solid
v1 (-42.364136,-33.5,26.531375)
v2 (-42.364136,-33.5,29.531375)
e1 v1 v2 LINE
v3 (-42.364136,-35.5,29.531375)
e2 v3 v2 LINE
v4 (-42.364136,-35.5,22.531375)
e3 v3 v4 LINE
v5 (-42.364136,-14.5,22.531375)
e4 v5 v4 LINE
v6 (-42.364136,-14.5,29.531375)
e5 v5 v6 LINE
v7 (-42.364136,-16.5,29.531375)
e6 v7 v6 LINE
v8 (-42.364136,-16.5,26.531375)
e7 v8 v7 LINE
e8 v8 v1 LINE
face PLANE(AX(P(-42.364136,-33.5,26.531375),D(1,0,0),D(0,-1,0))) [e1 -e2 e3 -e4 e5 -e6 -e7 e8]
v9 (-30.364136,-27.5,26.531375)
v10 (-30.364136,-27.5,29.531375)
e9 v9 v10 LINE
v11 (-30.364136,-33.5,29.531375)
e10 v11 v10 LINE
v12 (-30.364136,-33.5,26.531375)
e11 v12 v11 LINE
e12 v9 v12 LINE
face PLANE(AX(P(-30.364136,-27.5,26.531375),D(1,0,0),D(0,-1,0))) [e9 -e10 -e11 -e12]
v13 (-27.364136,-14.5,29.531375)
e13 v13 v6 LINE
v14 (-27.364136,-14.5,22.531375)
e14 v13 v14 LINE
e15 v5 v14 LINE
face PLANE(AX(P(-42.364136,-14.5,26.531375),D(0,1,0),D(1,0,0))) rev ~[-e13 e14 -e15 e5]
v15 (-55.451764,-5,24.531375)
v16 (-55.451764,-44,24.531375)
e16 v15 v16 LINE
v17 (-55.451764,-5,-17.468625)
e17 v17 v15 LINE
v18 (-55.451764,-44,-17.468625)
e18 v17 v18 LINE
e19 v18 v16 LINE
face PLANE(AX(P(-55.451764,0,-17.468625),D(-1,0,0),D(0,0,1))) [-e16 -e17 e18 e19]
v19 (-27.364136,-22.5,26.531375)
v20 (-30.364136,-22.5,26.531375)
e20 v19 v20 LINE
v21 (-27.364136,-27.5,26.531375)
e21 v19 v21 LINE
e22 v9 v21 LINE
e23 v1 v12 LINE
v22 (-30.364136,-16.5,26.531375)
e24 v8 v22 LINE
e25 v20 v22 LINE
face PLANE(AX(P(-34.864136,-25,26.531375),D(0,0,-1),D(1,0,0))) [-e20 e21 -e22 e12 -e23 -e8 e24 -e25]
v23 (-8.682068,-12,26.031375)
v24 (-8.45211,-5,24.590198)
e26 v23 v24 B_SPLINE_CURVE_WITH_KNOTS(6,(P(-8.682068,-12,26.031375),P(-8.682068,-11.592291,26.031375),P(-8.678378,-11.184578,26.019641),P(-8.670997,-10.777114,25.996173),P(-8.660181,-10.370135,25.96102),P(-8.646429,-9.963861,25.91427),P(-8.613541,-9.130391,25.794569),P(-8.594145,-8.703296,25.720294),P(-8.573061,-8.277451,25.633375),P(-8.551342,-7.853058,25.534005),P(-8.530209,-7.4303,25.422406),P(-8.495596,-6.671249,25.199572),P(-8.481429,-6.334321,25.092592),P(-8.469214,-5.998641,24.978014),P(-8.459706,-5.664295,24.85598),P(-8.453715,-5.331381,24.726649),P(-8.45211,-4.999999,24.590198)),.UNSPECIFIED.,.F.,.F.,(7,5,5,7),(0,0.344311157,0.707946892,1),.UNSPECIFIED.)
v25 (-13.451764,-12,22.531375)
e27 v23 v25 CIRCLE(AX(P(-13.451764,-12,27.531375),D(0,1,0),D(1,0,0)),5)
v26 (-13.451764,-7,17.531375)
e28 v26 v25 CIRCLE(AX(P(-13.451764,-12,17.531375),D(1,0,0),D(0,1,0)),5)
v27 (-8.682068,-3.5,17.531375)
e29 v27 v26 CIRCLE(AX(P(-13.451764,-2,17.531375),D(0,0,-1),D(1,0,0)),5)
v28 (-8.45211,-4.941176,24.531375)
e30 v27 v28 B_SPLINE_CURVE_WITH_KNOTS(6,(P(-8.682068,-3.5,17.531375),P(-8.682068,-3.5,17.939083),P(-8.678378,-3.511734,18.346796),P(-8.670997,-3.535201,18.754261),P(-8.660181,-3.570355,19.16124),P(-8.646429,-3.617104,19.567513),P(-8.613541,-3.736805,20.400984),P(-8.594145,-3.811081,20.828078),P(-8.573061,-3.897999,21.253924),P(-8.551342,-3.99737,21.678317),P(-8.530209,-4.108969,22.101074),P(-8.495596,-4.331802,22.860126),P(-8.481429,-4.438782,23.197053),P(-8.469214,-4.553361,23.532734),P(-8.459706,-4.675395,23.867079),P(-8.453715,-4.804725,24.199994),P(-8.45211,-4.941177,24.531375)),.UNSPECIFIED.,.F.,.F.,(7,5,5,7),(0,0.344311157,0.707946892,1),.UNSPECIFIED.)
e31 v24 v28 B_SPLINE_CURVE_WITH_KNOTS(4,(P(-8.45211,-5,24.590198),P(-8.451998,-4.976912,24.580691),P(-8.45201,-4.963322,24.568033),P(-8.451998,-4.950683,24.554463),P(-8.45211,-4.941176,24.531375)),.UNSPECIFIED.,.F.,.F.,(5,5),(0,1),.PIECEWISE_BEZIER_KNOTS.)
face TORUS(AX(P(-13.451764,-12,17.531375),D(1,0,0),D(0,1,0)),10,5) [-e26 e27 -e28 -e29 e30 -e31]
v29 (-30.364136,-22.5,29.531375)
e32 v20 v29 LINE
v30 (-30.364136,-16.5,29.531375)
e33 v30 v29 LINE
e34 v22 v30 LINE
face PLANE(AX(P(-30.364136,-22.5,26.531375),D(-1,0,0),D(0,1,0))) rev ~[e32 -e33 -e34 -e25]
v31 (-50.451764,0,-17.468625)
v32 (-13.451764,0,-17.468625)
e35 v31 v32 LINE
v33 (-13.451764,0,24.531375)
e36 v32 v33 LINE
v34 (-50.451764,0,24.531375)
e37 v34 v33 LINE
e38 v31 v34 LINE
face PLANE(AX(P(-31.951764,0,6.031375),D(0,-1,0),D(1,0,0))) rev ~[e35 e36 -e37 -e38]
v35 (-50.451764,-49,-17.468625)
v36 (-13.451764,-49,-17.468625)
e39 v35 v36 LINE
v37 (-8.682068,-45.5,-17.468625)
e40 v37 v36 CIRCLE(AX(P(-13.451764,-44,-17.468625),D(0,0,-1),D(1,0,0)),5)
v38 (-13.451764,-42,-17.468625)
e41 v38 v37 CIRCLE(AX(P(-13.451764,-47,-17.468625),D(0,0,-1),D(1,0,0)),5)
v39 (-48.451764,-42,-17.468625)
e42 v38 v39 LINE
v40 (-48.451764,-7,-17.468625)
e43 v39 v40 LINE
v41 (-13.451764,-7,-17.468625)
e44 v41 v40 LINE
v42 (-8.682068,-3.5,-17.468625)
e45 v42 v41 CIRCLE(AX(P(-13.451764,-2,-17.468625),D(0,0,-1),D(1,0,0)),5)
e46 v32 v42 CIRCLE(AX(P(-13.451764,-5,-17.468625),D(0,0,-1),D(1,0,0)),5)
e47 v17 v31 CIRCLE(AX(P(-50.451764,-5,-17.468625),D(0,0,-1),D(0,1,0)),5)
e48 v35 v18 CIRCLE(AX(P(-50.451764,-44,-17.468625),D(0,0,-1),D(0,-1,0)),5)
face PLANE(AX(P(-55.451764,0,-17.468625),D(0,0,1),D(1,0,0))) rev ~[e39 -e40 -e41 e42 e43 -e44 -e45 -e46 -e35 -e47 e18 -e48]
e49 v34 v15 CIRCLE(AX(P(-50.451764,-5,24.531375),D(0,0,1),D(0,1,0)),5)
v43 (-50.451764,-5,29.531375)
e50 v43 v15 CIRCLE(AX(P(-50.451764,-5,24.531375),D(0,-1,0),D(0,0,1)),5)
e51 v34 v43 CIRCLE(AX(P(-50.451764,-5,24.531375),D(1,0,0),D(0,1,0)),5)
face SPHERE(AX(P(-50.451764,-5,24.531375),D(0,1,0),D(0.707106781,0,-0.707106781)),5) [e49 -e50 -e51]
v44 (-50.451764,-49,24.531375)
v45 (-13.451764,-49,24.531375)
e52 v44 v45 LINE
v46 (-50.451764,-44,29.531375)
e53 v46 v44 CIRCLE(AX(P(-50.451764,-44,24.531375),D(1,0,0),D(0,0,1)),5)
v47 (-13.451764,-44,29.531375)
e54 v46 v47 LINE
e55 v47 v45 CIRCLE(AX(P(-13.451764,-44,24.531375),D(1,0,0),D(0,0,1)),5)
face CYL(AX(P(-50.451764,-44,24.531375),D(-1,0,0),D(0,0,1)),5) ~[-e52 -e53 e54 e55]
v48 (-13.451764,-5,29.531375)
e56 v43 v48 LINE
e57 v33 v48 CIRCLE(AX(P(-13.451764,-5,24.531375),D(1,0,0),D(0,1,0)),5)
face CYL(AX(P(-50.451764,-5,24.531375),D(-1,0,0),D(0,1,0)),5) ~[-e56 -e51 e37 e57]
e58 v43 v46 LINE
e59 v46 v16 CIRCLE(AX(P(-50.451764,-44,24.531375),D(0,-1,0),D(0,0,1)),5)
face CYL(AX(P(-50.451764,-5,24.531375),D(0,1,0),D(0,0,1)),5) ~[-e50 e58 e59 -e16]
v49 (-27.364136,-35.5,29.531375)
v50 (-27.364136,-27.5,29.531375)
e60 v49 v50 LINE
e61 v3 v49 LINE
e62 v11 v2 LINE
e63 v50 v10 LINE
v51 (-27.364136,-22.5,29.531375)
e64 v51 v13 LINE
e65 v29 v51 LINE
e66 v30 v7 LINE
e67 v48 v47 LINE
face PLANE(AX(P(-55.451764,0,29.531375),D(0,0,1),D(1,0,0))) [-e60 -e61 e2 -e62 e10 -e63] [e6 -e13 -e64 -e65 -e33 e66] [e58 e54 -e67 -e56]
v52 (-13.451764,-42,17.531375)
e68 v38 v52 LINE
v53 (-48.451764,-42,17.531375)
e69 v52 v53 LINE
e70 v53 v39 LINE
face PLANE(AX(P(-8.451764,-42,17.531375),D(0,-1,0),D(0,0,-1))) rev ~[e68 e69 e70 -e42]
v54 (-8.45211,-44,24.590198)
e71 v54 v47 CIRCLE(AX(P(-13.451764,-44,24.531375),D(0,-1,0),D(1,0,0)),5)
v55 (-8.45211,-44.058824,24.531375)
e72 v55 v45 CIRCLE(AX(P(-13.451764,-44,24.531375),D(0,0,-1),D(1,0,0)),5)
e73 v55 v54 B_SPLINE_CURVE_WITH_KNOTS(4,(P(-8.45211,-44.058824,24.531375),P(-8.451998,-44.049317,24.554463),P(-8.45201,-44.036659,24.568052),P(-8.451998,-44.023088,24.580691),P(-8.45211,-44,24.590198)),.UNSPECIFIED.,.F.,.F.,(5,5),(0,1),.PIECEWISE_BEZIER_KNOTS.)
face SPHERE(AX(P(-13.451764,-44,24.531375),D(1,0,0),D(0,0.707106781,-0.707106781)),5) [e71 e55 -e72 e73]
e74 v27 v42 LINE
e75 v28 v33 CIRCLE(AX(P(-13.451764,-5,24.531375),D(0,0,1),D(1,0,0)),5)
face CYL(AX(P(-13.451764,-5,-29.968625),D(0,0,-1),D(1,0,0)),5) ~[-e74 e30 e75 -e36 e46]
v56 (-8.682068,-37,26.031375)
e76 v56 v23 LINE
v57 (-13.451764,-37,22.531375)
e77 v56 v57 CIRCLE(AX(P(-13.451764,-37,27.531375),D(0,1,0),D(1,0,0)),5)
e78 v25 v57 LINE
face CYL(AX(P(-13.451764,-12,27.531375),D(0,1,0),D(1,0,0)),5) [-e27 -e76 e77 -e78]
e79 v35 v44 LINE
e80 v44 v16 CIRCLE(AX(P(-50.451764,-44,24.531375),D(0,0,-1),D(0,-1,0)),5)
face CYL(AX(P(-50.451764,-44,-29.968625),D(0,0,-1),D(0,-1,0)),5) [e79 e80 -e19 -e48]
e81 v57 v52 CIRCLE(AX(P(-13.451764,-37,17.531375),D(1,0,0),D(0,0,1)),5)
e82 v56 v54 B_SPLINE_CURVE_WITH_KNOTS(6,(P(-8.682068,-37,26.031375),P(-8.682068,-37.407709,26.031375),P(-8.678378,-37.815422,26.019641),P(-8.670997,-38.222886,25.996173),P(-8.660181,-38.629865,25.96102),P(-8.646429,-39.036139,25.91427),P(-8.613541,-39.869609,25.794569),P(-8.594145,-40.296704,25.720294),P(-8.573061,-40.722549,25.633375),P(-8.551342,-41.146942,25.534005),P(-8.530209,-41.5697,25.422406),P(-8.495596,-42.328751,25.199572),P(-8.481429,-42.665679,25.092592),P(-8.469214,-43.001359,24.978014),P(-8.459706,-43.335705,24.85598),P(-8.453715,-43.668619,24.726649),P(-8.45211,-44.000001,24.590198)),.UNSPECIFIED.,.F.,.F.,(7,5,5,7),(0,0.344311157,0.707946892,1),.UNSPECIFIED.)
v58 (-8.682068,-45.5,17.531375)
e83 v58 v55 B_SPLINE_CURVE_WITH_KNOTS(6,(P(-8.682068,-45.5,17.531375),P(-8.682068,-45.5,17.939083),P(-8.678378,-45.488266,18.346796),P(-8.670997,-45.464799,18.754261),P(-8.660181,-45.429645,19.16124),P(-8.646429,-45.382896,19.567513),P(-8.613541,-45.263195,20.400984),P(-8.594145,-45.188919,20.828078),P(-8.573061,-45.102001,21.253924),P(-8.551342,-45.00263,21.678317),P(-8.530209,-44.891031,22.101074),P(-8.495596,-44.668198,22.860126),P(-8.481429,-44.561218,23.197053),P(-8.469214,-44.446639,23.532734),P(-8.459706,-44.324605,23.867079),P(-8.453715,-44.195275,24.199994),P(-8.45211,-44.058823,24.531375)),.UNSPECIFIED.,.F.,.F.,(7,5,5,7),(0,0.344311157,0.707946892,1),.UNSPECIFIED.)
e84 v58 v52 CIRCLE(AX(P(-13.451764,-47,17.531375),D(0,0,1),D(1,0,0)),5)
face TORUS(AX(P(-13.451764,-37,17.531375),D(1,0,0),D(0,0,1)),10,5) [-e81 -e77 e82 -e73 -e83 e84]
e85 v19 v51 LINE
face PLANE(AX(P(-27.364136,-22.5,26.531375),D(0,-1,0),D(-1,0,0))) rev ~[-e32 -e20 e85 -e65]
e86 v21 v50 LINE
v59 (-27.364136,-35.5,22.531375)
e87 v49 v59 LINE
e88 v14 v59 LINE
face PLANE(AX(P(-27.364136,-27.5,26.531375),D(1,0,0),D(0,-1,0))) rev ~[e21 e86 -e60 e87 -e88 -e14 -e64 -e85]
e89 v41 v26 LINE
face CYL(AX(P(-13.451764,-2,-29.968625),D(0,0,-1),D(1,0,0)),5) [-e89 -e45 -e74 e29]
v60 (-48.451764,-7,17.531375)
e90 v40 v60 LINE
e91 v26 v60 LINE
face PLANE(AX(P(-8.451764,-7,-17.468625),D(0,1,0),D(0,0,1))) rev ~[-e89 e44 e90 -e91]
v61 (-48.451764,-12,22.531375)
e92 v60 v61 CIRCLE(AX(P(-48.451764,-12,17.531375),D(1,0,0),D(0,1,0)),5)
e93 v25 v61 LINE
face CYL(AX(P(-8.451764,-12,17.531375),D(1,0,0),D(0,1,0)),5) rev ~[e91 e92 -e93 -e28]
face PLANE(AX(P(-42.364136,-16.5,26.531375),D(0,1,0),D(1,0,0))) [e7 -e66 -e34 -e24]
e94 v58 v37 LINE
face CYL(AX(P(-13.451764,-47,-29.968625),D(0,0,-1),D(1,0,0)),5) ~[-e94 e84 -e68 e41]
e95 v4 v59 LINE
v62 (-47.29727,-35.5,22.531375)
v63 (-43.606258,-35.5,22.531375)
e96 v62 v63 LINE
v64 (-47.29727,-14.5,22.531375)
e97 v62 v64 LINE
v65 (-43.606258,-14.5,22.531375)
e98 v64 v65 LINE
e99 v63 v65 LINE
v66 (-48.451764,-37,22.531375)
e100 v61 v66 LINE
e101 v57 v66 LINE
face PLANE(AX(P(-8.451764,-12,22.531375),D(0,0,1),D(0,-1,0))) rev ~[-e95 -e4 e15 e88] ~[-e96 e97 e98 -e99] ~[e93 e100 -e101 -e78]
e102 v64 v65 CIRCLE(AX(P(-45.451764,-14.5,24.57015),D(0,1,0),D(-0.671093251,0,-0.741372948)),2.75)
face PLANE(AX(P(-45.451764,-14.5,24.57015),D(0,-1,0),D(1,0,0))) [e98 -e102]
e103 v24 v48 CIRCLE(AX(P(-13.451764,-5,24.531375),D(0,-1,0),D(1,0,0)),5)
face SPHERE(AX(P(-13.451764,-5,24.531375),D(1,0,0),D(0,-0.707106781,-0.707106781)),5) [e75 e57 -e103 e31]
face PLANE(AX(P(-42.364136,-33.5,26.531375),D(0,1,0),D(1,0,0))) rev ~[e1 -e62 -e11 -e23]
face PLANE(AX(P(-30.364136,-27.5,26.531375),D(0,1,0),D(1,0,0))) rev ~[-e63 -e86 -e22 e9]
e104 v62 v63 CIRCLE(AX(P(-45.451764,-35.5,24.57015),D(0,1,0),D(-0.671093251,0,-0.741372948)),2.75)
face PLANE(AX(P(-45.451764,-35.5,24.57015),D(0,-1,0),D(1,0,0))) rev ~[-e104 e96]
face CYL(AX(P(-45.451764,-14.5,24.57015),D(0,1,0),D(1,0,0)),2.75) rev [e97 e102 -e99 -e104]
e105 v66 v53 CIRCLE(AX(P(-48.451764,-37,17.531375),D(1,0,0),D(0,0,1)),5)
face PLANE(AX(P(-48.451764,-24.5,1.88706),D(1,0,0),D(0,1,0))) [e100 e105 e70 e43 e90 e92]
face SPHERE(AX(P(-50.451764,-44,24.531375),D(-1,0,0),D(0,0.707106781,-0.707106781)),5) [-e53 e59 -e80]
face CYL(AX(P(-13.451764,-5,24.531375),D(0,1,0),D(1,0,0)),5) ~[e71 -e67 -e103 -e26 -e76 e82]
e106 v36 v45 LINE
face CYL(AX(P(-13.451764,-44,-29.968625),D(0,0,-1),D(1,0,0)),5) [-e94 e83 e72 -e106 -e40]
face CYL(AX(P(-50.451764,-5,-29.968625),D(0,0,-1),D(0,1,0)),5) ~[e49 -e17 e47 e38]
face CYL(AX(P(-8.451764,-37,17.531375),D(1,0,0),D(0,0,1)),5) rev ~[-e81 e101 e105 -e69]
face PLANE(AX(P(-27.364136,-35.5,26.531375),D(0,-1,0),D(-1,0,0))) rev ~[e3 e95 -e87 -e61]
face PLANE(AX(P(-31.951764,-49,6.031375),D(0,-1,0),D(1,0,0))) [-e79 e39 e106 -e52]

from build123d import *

# Parameters (mm, degrees)
F0_W         = 47
F0_H         = 47
F1_DEPTH     = 49
F3_DEPTH     = 40
F4_T1_DEPTH  = 37
F4_T3_DEPTH  = 54.5
F4_T5_DEPTH  = 39
F4_T7_DEPTH  = 25
F4_T9_DEPTH  = 47.5
F4_S13_W     = 5
F4_S13_H     = 5
F4_T14_DEPTH = 5
F4_S19_W     = 5
F4_S19_H     = 5
F4_T20_DEPTH = 5
F4_S25_W     = 5
F4_S25_H     = 5
F4_T26_DEPTH = 5
F4_S31_W     = 5
F4_S31_H     = 5
F4_T32_DEPTH = 5
F4_T36_ANGLE = 90
F4_T38_ANGLE = 90
F6_R         = 2.75
F7_DEPTH     = 21
F8_W         = 15
F8_H         = 21
F9_DEPTH     = 4
F10_W        = 3
F10_H        = 6
F10_W_2      = 12
F10_H_2      = 2
F11_DEPTH    = 3.0010001


# Not quite as in the source:
# - a fillet or chamfer that OpenCascade refuses, or shapes differently, is made with other operations: its cross-section is extruded or revolved along the edge and cut away or added


with BuildPart() as f1:
    # F0 (on Front) → F1 (new body)
    with BuildSketch(Plane.XZ):
        with Locations((-31.9517639409, 6.0313746929)):
            Rectangle(F0_W, F0_H)
    extrude(amount=F1_DEPTH)

    # F2 (on face) → F3 (cut)
    with BuildSketch(Plane.YZ.offset(-8.4517639409)):
        with BuildLine():
            Line((-12, 22.5313746929), (-37, 22.5313746929))
            ThreePointArc((-37, 22.5313746929), (-40.5355339059, 21.0669085988), (-42, 17.5313746929))
            Line((-42, 17.5313746929), (-42, -17.4686253071))
            Line((-42, -17.4686253071), (-7, -17.4686253071))
            Line((-7, -17.4686253071), (-7, 17.5313746929))
            ThreePointArc((-7, 17.5313746929), (-8.4644660941, 21.0669085988), (-12, 22.5313746929))
        make_face()
    extrude(amount=-F3_DEPTH, mode=Mode.SUBTRACT)

    # F4: fillet of radius 5 on 9 edges, made by hand

    # F4_s2 → F4_t1 (cut)
    with BuildSketch(Plane.YZ.offset(-50.4517639409)):
        with BuildLine():
            ThreePointArc((-44, 29.5313746929), (-47.5355339059, 28.0669085988), (-49, 24.5313746929))
            Line((-49, 24.5313746929), (-49, 29.5313746929))
            Line((-49, 29.5313746929), (-44, 29.5313746929))
        make_face()
        with BuildLine():
            ThreePointArc((0, 24.5313746929), (-1.4644660941, 28.0669085988), (-5, 29.5313746929))
            Line((-5, 29.5313746929), (0, 29.5313746929))
            Line((0, 29.5313746929), (0, 24.5313746929))
        make_face()
    extrude(amount=F4_T1_DEPTH, mode=Mode.SUBTRACT)

    # F4_s4 → F4_t3 (cut)
    with BuildSketch(Plane.XY.offset(-29.9686253071)):
        with BuildLine():
            ThreePointArc((-8.4517639409, -44), (-9.9162300349, -47.5355339059), (-13.4517639409, -49))
            Line((-13.4517639409, -49), (-8.4517639409, -49))
            Line((-8.4517639409, -49), (-8.4517639409, -44))
        make_face()
        with BuildLine():
            ThreePointArc((-8.4517639409, -5), (-9.9162300349, -1.4644660941), (-13.4517639409, 0))
            Line((-13.4517639409, 0), (-8.4517639409, 0))
            Line((-8.4517639409, 0), (-8.4517639409, -5))
        make_face()
        with BuildLine():
            ThreePointArc((-50.4517639409, 0), (-53.9872978468, -1.4644660941), (-55.4517639409, -5))
            Line((-55.4517639409, -5), (-55.4517639409, 0))
            Line((-55.4517639409, 0), (-50.4517639409, 0))
        make_face()
        with BuildLine():
            ThreePointArc((-50.4517639409, -49), (-53.9872978468, -47.5355339059), (-55.4517639409, -44))
            Line((-55.4517639409, -44), (-55.4517639409, -49))
            Line((-55.4517639409, -49), (-50.4517639409, -49))
        make_face()
    extrude(amount=F4_T3_DEPTH, mode=Mode.SUBTRACT)

    # F4_s6 → F4_t5 (cut)
    with BuildSketch(Plane.XZ.offset(5)):
        with BuildLine():
            ThreePointArc((-8.4517639409, 24.5313746929), (-9.9162300349, 28.0669085988), (-13.4517639409, 29.5313746929))
            Line((-13.4517639409, 29.5313746929), (-8.4517639409, 29.5313746929))
            Line((-8.4517639409, 29.5313746929), (-8.4517639409, 24.5313746929))
        make_face()
        with BuildLine():
            ThreePointArc((-50.4517639409, 29.5313746929), (-53.9872978468, 28.0669085988), (-55.4517639409, 24.5313746929))
            Line((-55.4517639409, 24.5313746929), (-55.4517639409, 29.5313746929))
            Line((-55.4517639409, 29.5313746929), (-50.4517639409, 29.5313746929))
        make_face()
    extrude(amount=F4_T5_DEPTH, mode=Mode.SUBTRACT)

    # F4_s8 → F4_t7 (cut)
    with BuildSketch(Plane.XZ.offset(12)):
        with BuildLine():
            ThreePointArc((-8.4517639409, 27.5313746929), (-9.9162300349, 23.995840787), (-13.4517639409, 22.5313746929))
            Line((-13.4517639409, 22.5313746929), (-8.4517639409, 22.5313746929))
            Line((-8.4517639409, 22.5313746929), (-8.4517639409, 27.5313746929))
        make_face()
    extrude(amount=F4_T7_DEPTH, mode=Mode.SUBTRACT)

    # F4_s10 → F4_t9 (cut)
    with BuildSketch(Plane.XY.offset(-29.9686253071)):
        with BuildLine():
            ThreePointArc((-8.4517639409, -47), (-9.9162300349, -43.4644660941), (-13.4517639409, -42))
            Line((-13.4517639409, -42), (-8.4517639409, -42))
            Line((-8.4517639409, -42), (-8.4517639409, -47))
        make_face()
        with BuildLine():
            ThreePointArc((-8.4517639409, -2), (-9.9162300349, -5.5355339059), (-13.4517639409, -7))
            Line((-13.4517639409, -7), (-8.4517639409, -7))
            Line((-8.4517639409, -7), (-8.4517639409, -2))
        make_face()
    extrude(amount=F4_T9_DEPTH, mode=Mode.SUBTRACT)


with BuildPart() as f4_tool12:
    # F4_s13 → F4_t14 (new body)
    with BuildSketch(Plane.YZ.offset(-13.4517639409)):
        with Locations((-46.5, 27.0313746929)):
            Rectangle(F4_S13_W, F4_S13_H)
    extrude(amount=F4_T14_DEPTH)

    # F4_s15 → F4_t16 (revolve, cut)
    with BuildSketch(Plane(origin=(-13.4517639409, -44, 24.5313746929), x_dir=(0, 0.7071067812, -0.7071067812), z_dir=(0, -0.7071067812, -0.7071067812))):
        with BuildLine():
            ThreePointArc((0, -5), (5, 0), (0, 5))
            Line((0, 5), (0, -5))
        make_face()
    revolve(axis=Axis((-13.4517639409, -44, 24.5313746929), (1, 0, 0)), mode=Mode.SUBTRACT)


with BuildPart() as f1_1:
    add(f1.part)

    # F4_t11: cut F4_tool12
    add(f4_tool12.part, mode=Mode.SUBTRACT)


with BuildPart() as f4_tool18:
    # F4_s19 → F4_t20 (new body)
    with BuildSketch(Plane.YZ.offset(-50.4517639409)):
        with Locations((-46.5, 27.0313746929)):
            Rectangle(F4_S19_W, F4_S19_H)
    extrude(amount=-F4_T20_DEPTH)

    # F4_s21 → F4_t22 (revolve, cut)
    with BuildSketch(Plane(origin=(-50.4517639409, -44, 24.5313746929), x_dir=(0, 0.7071067812, -0.7071067812), z_dir=(0, 0.7071067812, 0.7071067812))):
        with BuildLine():
            ThreePointArc((0, -5), (5, 0), (0, 5))
            Line((0, 5), (0, -5))
        make_face()
    revolve(axis=Axis((-50.4517639409, -44, 24.5313746929), (-1, 0, 0)), mode=Mode.SUBTRACT)


with BuildPart() as f1_2:
    add(f1_1.part)

    # F4_t17: cut F4_tool18
    add(f4_tool18.part, mode=Mode.SUBTRACT)


with BuildPart() as f4_tool24:
    # F4_s25 → F4_t26 (new body)
    with BuildSketch(Plane.YZ.offset(-13.4517639409)):
        with Locations((-2.5, 27.0313746929)):
            Rectangle(F4_S25_W, F4_S25_H)
    extrude(amount=F4_T26_DEPTH)

    # F4_s27 → F4_t28 (revolve, cut)
    with BuildSketch(Plane(origin=(-13.4517639409, -5, 24.5313746929), x_dir=(0, -0.7071067812, -0.7071067812), z_dir=(0, -0.7071067812, 0.7071067812))):
        with BuildLine():
            ThreePointArc((0, -5), (5, 0), (0, 5))
            Line((0, 5), (0, -5))
        make_face()
    revolve(axis=Axis((-13.4517639409, -5, 24.5313746929), (1, 0, 0)), mode=Mode.SUBTRACT)


with BuildPart() as f1_3:
    add(f1_2.part)

    # F4_t23: cut F4_tool24
    add(f4_tool24.part, mode=Mode.SUBTRACT)


with BuildPart() as f4_tool30:
    # F4_s31 → F4_t32 (new body)
    with BuildSketch(Plane.XZ.offset(5)):
        with Locations((-52.9517639409, 27.0313746929)):
            Rectangle(F4_S31_W, F4_S31_H)
    extrude(amount=-F4_T32_DEPTH)

    # F4_s33 → F4_t34 (revolve, cut)
    with BuildSketch(Plane(origin=(-50.4517639409, -5, 24.5313746929), x_dir=(0.7071067812, 0, -0.7071067812), z_dir=(0.7071067812, 0, 0.7071067812))):
        with BuildLine():
            ThreePointArc((0, -5), (5, 0), (0, 5))
            Line((0, 5), (0, -5))
        make_face()
    revolve(axis=Axis((-50.4517639409, -5, 24.5313746929), (0, 1, 0)), mode=Mode.SUBTRACT)


with BuildPart() as f1_4:
    add(f1_3.part)

    # F4_t29: cut F4_tool30
    add(f4_tool30.part, mode=Mode.SUBTRACT)

    # F4_s35 → F4_t36 (revolve, cut)
    with BuildSketch(Plane.XY.offset(17.5313746929)):
        with BuildLine():
            ThreePointArc((-8.4517639409, -2), (-9.9162300349, -5.5355339059), (-13.4517639409, -7))
            Line((-13.4517639409, -7), (-8.4517639409, -7))
            Line((-8.4517639409, -7), (-8.4517639409, -2))
        make_face()
    revolve(axis=Axis((-8.4517639409, -12, 17.5313746929), (1, 0, 0)), revolution_arc=F4_T36_ANGLE, mode=Mode.SUBTRACT)

    # F4_s37 → F4_t38 (revolve, cut)
    with BuildSketch(Plane.XZ.offset(37)):
        with BuildLine():
            ThreePointArc((-8.4517639409, 27.5313746929), (-9.9162300349, 23.995840787), (-13.4517639409, 22.5313746929))
            Line((-13.4517639409, 22.5313746929), (-8.4517639409, 22.5313746929))
            Line((-8.4517639409, 22.5313746929), (-8.4517639409, 27.5313746929))
        make_face()
    revolve(axis=Axis((-8.4517639409, -37, 17.5313746929), (1, 0, 0)), revolution_arc=F4_T38_ANGLE, mode=Mode.SUBTRACT)

    # F6 (on offset) → F7 (cut)
    with BuildSketch(Plane.XZ.offset(14.5)):
        with Locations((-45.4517639409, 24.5701503009)):
            Circle(F6_R)
    extrude(amount=F7_DEPTH, mode=Mode.SUBTRACT)

    # F8 (on face) → F9 (cut)
    with BuildSketch(Plane(origin=(0, 0, 22.5313746929), x_dir=(1, 0, 0), z_dir=(0, 0, -1))):
        with Locations((-34.8641358682, 25)):
            Rectangle(F8_W, F8_H)
    extrude(amount=-F9_DEPTH, mode=Mode.SUBTRACT)

    # F10 (on face) → F11 (cut, through all)
    with BuildSketch(Plane(origin=(0, 0, 26.5313746929), x_dir=(1, 0, 0), z_dir=(0, 0, -1))):
        with Locations((-28.8641358682, 30.5)):
            Rectangle(F10_W, F10_H)
        Polygon((-30.3641358682, 22.5), (-30.3641358682, 16.5), (-30.3641358682, 14.5), (-27.3641358682, 14.5), (-27.3641358682, 22.5), align=None)
        with Locations((-36.3641358682, 34.5)):
            Rectangle(F10_W_2, F10_H_2)
        with Locations((-28.8641358682, 34.5)):
            Rectangle(F10_W, F10_H_2)
        with Locations((-36.3641358682, 15.5)):
            Rectangle(F10_W_2, F10_H_2)
    extrude(amount=-F11_DEPTH, mode=Mode.SUBTRACT)


solid = f1_4.part
